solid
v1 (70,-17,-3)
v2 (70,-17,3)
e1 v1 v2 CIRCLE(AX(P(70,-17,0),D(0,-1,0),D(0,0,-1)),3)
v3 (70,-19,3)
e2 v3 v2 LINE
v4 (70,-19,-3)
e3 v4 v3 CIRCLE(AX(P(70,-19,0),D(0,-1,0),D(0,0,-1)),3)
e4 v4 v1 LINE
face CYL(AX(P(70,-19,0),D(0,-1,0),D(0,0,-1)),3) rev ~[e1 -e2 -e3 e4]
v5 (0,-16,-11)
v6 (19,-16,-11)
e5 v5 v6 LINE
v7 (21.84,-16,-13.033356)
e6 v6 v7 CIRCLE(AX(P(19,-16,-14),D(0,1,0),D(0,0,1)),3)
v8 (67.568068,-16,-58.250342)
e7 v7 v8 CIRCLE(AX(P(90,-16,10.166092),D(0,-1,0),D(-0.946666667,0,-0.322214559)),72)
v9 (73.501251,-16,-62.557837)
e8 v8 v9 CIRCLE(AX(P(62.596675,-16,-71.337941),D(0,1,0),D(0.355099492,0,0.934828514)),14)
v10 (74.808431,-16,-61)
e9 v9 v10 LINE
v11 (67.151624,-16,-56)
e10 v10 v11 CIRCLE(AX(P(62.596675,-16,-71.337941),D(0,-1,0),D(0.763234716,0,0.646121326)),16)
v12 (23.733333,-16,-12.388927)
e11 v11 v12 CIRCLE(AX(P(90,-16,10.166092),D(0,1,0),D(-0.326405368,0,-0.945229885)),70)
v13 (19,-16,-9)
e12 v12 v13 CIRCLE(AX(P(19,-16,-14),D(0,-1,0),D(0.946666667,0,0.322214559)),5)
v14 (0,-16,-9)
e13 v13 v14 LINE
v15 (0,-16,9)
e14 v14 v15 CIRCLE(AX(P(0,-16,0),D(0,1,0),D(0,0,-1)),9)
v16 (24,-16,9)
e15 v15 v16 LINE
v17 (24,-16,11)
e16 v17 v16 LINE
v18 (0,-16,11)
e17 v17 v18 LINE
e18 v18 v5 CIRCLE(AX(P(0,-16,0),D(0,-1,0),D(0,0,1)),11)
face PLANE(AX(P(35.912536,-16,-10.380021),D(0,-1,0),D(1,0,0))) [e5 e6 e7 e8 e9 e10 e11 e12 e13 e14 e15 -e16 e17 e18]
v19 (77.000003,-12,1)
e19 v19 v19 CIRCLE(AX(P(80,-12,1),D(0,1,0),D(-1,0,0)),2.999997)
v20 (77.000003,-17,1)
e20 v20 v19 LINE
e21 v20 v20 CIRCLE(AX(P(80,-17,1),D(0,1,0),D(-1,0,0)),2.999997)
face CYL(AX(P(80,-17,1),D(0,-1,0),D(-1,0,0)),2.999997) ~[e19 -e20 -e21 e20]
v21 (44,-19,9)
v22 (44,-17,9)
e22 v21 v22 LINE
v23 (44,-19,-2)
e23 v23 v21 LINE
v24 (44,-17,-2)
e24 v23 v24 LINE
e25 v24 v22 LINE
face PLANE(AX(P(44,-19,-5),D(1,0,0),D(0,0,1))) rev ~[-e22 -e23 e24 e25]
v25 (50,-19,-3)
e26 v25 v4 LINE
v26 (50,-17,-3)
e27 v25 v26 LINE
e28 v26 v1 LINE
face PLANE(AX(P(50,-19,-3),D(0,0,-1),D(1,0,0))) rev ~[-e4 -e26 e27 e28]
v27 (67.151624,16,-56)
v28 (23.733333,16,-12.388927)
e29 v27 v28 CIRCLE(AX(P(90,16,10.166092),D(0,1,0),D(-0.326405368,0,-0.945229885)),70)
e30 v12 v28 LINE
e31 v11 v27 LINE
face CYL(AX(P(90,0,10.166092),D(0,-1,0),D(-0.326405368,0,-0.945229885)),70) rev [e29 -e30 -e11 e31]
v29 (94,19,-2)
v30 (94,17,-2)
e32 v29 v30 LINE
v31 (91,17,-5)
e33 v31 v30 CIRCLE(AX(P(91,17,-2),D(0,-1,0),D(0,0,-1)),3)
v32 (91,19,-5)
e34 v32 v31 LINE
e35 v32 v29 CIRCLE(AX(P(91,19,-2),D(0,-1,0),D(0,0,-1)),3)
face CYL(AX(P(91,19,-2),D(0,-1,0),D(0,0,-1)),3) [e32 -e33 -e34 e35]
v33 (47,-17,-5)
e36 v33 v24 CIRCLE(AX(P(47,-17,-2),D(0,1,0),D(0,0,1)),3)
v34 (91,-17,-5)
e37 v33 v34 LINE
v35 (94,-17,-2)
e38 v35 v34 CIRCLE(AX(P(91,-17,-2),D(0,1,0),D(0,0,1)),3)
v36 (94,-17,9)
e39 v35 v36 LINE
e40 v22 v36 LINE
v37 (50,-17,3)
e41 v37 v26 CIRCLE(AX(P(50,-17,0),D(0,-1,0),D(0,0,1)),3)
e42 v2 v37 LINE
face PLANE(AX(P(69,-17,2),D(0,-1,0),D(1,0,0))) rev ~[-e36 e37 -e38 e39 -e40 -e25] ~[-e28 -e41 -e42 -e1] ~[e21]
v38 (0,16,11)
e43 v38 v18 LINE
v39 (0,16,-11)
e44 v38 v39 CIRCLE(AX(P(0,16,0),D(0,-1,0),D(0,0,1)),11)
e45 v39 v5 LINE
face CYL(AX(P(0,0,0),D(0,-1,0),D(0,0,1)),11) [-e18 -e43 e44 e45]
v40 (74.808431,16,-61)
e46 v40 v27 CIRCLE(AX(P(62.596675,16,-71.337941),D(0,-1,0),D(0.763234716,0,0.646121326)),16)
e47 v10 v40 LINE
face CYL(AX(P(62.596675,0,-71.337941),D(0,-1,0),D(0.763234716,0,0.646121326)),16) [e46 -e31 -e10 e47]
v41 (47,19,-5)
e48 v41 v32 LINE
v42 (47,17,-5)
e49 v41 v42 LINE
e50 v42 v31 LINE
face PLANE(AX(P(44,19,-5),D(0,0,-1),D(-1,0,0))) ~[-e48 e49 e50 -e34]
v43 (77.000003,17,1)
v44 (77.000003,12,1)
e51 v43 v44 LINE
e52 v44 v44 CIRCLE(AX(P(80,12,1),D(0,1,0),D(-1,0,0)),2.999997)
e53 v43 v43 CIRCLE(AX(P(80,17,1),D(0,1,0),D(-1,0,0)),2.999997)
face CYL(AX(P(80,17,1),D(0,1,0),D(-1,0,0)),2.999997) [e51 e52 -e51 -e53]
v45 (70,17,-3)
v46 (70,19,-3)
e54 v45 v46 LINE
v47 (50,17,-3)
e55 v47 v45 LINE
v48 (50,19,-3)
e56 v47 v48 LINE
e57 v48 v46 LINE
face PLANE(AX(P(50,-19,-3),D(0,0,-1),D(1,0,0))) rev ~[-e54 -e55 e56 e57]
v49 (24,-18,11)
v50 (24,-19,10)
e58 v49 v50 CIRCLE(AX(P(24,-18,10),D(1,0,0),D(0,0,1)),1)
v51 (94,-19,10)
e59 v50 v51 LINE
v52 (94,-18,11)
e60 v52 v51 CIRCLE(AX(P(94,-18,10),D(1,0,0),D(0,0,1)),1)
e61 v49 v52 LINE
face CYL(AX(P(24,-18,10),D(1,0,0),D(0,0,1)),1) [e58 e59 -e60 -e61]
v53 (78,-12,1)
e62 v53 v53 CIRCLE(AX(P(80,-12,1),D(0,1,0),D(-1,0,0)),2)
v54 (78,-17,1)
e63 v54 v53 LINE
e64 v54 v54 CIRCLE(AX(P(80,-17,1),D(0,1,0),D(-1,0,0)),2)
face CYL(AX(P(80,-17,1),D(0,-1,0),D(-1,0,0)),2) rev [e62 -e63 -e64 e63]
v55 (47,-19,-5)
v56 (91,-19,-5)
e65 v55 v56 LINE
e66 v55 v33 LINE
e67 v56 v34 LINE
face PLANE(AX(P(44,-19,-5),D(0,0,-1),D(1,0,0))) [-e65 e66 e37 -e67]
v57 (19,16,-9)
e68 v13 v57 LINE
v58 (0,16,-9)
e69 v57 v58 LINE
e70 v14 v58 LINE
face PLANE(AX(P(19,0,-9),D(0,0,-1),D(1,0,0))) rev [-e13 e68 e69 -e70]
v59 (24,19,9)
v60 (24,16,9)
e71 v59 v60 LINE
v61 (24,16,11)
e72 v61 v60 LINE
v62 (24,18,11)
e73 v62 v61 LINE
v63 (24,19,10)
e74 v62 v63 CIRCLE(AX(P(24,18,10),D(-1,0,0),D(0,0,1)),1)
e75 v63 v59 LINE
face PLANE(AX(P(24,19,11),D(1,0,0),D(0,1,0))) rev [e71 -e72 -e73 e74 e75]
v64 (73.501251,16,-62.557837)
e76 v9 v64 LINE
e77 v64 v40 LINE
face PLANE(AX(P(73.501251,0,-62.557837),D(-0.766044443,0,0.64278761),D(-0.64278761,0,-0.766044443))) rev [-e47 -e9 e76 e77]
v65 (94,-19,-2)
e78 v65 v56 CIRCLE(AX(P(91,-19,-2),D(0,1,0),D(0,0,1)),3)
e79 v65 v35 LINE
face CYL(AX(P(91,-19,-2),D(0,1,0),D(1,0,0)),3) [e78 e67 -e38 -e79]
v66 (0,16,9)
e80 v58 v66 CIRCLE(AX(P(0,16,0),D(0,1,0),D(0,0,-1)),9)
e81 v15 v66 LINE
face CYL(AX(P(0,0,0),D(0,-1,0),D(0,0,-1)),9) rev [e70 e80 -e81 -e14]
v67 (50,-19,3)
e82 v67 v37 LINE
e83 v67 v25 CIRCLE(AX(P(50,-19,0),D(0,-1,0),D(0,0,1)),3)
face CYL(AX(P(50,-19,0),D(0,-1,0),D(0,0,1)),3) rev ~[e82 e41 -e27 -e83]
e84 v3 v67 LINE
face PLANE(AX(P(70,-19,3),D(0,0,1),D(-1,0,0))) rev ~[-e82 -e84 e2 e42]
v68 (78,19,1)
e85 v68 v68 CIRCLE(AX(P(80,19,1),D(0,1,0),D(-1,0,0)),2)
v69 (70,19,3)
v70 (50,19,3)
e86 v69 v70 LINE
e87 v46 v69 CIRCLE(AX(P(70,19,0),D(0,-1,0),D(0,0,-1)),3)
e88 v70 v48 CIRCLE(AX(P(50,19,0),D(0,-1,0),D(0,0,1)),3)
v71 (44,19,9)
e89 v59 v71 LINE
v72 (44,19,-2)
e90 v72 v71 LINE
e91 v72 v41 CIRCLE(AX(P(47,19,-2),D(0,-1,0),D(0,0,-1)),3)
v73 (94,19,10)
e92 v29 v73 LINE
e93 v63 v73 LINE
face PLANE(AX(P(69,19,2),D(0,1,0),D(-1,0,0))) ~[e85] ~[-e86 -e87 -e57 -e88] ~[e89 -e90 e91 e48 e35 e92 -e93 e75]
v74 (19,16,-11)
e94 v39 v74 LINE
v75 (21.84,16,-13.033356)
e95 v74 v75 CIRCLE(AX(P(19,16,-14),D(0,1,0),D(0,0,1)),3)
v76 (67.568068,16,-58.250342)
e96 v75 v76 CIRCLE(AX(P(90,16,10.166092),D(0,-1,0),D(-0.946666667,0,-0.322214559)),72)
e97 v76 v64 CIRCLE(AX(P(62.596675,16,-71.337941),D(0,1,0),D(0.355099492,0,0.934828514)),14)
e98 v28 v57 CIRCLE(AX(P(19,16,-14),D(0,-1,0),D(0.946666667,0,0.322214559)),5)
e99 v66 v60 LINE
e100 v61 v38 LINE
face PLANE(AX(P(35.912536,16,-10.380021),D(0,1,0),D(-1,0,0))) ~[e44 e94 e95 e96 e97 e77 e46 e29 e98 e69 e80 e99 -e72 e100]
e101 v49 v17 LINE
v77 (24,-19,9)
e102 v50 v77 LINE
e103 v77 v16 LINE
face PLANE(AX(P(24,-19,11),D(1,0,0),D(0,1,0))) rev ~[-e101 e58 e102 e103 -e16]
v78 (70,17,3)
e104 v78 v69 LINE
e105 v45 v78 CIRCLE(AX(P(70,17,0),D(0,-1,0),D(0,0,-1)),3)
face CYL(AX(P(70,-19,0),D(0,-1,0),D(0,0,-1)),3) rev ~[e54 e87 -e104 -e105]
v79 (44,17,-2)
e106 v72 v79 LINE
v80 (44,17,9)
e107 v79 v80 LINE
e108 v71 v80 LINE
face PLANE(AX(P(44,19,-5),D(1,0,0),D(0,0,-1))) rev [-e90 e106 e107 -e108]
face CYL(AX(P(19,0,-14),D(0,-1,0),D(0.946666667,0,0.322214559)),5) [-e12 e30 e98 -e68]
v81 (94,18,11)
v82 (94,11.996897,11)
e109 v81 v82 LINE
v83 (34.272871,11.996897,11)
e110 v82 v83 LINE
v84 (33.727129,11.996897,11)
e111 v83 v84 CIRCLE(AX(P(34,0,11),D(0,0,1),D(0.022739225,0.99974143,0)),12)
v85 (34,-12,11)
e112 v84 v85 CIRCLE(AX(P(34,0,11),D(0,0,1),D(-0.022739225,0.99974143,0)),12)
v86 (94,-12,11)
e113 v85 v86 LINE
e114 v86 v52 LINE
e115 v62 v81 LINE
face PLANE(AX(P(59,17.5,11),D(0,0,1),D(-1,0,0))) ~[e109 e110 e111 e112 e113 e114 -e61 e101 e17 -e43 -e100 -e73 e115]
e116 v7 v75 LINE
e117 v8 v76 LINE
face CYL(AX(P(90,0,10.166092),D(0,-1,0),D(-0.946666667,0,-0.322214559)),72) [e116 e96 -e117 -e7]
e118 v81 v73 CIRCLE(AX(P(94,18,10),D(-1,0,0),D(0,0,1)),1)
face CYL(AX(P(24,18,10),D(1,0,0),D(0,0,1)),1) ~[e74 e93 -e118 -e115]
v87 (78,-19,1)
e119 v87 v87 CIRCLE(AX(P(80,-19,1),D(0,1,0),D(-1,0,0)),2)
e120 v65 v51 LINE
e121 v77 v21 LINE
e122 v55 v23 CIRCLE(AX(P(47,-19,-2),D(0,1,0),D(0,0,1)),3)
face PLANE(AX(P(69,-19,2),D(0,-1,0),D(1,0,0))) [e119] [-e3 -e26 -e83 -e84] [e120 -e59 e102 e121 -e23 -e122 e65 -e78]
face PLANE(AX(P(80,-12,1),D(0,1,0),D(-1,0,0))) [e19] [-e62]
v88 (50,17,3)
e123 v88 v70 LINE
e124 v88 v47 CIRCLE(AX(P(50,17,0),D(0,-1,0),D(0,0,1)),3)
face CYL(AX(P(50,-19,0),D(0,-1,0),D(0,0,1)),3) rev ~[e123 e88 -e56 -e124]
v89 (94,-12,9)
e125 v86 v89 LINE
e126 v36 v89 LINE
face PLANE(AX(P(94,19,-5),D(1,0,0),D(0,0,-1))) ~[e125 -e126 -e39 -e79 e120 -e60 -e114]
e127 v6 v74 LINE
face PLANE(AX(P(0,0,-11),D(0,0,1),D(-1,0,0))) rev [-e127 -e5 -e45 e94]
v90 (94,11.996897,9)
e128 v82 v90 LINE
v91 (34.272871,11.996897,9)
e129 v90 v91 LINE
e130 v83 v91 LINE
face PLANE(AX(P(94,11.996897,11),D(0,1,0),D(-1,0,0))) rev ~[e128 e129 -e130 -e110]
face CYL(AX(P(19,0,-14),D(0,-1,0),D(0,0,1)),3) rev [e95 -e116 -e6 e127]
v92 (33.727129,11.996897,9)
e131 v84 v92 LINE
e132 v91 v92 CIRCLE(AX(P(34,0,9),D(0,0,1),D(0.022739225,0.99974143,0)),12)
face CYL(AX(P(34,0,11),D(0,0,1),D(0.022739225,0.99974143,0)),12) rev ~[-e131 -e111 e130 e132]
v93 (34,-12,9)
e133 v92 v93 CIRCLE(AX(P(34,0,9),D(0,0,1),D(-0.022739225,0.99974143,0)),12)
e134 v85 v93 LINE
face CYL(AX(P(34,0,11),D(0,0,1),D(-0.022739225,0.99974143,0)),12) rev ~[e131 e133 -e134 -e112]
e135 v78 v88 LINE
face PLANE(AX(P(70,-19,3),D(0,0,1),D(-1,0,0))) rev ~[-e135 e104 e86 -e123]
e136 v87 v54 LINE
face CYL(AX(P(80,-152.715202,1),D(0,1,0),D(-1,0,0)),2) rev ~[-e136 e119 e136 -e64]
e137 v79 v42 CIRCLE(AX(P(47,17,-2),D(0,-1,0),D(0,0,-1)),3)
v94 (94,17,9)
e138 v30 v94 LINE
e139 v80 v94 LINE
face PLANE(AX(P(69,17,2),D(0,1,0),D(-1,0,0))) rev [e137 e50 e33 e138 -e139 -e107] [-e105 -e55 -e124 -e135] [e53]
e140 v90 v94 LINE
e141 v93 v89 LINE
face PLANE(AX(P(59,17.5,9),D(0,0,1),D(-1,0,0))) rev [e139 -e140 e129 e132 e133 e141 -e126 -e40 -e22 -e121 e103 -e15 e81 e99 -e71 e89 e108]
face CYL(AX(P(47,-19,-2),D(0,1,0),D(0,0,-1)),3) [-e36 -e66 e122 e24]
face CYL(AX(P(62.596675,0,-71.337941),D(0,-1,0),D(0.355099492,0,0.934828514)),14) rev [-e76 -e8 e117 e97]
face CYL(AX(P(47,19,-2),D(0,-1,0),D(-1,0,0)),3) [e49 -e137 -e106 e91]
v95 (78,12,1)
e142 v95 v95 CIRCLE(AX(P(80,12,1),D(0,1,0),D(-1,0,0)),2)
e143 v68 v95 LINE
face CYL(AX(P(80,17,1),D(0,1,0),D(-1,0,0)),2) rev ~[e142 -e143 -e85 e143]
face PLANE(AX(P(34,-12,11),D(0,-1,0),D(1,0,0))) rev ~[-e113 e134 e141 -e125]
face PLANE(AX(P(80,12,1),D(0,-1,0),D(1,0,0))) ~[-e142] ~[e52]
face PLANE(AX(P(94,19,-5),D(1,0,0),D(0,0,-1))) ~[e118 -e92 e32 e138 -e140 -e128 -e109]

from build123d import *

# Parameters (mm, degrees)
F1_DEPTH  = 16
F2_W      = 70
F2_H      = 3
F3_DEPTH  = 2
F4_W      = 50
F4_H      = 14
F5_DEPTH  = 2
F6_R      = 1
F9_DEPTH  = 2
F11_DEPTH = 38.001
F13_D     = 4
F14_R     = 2.999996841
F14_R_2   = 2
F15_DEPTH = 5
F16_R     = 3


# Not quite as in the source:
# - a pattern or mirror of a feature is missing from the dataset's text; its kind, count and spacing are read off the source's solid


with BuildPart() as f1:
    # F0 (on Front) → F1 (new body)
    with BuildSketch(Plane.XZ):
        with BuildLine():
            ThreePointArc((0, -9), (-9, 0), (0, 9))
            Line((0, 9), (94, 9))
            Line((94, 9), (94, 11))
            Line((94, 11), (0, 11))
            ThreePointArc((0, 11), (-11, 0), (0, -11))
            Line((0, -11), (19, -11))
            ThreePointArc((19, -11), (20.7464347921, -11.5607448848), (21.84, -13.0333563221))
            ThreePointArc((21.84, -13.0333563221), (39.3752187726, -41.0308955197), (67.5680682322, -58.2503420228))
            ThreePointArc((67.5680682322, -58.2503420228), (70.8216506695, -60.0087849904), (73.5012506711, -62.5578366136))
            Line((73.5012506711, -62.5578366136), (74.808430799, -61))
            ThreePointArc((74.808430799, -61), (71.3448519203, -57.9413219983), (67.1516242057, -56))
            ThreePointArc((67.1516242057, -56), (40.3930033582, -39.2216179023), (23.7333333333, -12.3889272035))
            ThreePointArc((23.7333333333, -12.3889272035), (21.9107246536, -9.9345748081), (19, -9))
            Line((19, -9), (0, -9))
        make_face()
    extrude(amount=F1_DEPTH)

    # F2 (on face) → F3 (join)
    with BuildSketch(Plane.XY.offset(11)):
        with Locations((59, -17.5)):
            Rectangle(F2_W, F2_H)
    extrude(amount=-F3_DEPTH)

    # F4 (on face) → F5 (join)
    with BuildSketch(Plane.XZ.offset(19)):
        with Locations((69, 2)):
            Rectangle(F4_W, F4_H)
    extrude(amount=-F5_DEPTH)

    # F6
    f6_edges = [f1.edges().sort_by_distance(p)[0] for p in [
        (59, -19, 11),
    ]]
    fillet(f6_edges, radius=F6_R)

    # F7: F1 across plane


with BuildPart() as f1_1:
    add(f1.part)
    add(f1.part.mirror(Plane.XZ))

    # F8 (on face) → F9 (cut)
    with BuildSketch(Plane.XY.offset(11)):
        with BuildLine():
            Line((33.7271293001, 11.9968971647), (34.2728706999, 11.9968971647))
            ThreePointArc((34.2728706999, 11.9968971647), (34, 12), (33.7271293001, 11.9968971647))
        make_face()
        with BuildLine():
            Line((94, 11.9968971647), (34.2728706999, 11.9968971647))
            Line((34.2728706999, 11.9968971647), (33.7271293001, 11.9968971647))
            ThreePointArc((33.7271293001, 11.9968971647), (22.0007757339, -0.1364441703), (34, -12))
            Line((34, -12), (94, -12))
            Line((94, -12), (94, 11.9968971647))
        make_face()
    extrude(amount=-F9_DEPTH, mode=Mode.SUBTRACT)

    # F10 (on face) → F11 (cut, through all)
    with BuildSketch(Plane.XZ.offset(19)):
        with BuildLine():
            ThreePointArc((50, 3), (47, 0), (50, -3))
            Line((50, -3), (70, -3))
            ThreePointArc((70, -3), (73, 0), (70, 3))
            Line((70, 3), (50, 3))
        make_face()
    extrude(amount=-F11_DEPTH, mode=Mode.SUBTRACT)

    # F13 (through all)
    with Locations(Plane.XZ.offset(19)):
        with Locations((80, 1)):
            Hole(F13_D / 2)

    # F14 (on face) → F15 (join)
    with BuildSketch(Plane(origin=(0, -17, 0), x_dir=(-1, 0, 0), z_dir=(0, 1, 0))):
        with Locations((-80, 1)):
            Circle(F14_R)
        with Locations((-80, 1)):
            Circle(F14_R_2, mode=Mode.SUBTRACT)
    f15 = extrude(amount=F15_DEPTH)

    # F15_copies: F15 across plane
    add(f15.mirror(Plane.ZX))

    # F16
    f16_edges = [f1_1.edges().sort_by_distance(p)[0] for p in [
        (94, -18, -5),
        (44, -18, -5),
        (94, 18, -5),
        (44, 18, -5),
    ]]
    fillet(f16_edges, radius=F16_R)


solid = f1_1.part
